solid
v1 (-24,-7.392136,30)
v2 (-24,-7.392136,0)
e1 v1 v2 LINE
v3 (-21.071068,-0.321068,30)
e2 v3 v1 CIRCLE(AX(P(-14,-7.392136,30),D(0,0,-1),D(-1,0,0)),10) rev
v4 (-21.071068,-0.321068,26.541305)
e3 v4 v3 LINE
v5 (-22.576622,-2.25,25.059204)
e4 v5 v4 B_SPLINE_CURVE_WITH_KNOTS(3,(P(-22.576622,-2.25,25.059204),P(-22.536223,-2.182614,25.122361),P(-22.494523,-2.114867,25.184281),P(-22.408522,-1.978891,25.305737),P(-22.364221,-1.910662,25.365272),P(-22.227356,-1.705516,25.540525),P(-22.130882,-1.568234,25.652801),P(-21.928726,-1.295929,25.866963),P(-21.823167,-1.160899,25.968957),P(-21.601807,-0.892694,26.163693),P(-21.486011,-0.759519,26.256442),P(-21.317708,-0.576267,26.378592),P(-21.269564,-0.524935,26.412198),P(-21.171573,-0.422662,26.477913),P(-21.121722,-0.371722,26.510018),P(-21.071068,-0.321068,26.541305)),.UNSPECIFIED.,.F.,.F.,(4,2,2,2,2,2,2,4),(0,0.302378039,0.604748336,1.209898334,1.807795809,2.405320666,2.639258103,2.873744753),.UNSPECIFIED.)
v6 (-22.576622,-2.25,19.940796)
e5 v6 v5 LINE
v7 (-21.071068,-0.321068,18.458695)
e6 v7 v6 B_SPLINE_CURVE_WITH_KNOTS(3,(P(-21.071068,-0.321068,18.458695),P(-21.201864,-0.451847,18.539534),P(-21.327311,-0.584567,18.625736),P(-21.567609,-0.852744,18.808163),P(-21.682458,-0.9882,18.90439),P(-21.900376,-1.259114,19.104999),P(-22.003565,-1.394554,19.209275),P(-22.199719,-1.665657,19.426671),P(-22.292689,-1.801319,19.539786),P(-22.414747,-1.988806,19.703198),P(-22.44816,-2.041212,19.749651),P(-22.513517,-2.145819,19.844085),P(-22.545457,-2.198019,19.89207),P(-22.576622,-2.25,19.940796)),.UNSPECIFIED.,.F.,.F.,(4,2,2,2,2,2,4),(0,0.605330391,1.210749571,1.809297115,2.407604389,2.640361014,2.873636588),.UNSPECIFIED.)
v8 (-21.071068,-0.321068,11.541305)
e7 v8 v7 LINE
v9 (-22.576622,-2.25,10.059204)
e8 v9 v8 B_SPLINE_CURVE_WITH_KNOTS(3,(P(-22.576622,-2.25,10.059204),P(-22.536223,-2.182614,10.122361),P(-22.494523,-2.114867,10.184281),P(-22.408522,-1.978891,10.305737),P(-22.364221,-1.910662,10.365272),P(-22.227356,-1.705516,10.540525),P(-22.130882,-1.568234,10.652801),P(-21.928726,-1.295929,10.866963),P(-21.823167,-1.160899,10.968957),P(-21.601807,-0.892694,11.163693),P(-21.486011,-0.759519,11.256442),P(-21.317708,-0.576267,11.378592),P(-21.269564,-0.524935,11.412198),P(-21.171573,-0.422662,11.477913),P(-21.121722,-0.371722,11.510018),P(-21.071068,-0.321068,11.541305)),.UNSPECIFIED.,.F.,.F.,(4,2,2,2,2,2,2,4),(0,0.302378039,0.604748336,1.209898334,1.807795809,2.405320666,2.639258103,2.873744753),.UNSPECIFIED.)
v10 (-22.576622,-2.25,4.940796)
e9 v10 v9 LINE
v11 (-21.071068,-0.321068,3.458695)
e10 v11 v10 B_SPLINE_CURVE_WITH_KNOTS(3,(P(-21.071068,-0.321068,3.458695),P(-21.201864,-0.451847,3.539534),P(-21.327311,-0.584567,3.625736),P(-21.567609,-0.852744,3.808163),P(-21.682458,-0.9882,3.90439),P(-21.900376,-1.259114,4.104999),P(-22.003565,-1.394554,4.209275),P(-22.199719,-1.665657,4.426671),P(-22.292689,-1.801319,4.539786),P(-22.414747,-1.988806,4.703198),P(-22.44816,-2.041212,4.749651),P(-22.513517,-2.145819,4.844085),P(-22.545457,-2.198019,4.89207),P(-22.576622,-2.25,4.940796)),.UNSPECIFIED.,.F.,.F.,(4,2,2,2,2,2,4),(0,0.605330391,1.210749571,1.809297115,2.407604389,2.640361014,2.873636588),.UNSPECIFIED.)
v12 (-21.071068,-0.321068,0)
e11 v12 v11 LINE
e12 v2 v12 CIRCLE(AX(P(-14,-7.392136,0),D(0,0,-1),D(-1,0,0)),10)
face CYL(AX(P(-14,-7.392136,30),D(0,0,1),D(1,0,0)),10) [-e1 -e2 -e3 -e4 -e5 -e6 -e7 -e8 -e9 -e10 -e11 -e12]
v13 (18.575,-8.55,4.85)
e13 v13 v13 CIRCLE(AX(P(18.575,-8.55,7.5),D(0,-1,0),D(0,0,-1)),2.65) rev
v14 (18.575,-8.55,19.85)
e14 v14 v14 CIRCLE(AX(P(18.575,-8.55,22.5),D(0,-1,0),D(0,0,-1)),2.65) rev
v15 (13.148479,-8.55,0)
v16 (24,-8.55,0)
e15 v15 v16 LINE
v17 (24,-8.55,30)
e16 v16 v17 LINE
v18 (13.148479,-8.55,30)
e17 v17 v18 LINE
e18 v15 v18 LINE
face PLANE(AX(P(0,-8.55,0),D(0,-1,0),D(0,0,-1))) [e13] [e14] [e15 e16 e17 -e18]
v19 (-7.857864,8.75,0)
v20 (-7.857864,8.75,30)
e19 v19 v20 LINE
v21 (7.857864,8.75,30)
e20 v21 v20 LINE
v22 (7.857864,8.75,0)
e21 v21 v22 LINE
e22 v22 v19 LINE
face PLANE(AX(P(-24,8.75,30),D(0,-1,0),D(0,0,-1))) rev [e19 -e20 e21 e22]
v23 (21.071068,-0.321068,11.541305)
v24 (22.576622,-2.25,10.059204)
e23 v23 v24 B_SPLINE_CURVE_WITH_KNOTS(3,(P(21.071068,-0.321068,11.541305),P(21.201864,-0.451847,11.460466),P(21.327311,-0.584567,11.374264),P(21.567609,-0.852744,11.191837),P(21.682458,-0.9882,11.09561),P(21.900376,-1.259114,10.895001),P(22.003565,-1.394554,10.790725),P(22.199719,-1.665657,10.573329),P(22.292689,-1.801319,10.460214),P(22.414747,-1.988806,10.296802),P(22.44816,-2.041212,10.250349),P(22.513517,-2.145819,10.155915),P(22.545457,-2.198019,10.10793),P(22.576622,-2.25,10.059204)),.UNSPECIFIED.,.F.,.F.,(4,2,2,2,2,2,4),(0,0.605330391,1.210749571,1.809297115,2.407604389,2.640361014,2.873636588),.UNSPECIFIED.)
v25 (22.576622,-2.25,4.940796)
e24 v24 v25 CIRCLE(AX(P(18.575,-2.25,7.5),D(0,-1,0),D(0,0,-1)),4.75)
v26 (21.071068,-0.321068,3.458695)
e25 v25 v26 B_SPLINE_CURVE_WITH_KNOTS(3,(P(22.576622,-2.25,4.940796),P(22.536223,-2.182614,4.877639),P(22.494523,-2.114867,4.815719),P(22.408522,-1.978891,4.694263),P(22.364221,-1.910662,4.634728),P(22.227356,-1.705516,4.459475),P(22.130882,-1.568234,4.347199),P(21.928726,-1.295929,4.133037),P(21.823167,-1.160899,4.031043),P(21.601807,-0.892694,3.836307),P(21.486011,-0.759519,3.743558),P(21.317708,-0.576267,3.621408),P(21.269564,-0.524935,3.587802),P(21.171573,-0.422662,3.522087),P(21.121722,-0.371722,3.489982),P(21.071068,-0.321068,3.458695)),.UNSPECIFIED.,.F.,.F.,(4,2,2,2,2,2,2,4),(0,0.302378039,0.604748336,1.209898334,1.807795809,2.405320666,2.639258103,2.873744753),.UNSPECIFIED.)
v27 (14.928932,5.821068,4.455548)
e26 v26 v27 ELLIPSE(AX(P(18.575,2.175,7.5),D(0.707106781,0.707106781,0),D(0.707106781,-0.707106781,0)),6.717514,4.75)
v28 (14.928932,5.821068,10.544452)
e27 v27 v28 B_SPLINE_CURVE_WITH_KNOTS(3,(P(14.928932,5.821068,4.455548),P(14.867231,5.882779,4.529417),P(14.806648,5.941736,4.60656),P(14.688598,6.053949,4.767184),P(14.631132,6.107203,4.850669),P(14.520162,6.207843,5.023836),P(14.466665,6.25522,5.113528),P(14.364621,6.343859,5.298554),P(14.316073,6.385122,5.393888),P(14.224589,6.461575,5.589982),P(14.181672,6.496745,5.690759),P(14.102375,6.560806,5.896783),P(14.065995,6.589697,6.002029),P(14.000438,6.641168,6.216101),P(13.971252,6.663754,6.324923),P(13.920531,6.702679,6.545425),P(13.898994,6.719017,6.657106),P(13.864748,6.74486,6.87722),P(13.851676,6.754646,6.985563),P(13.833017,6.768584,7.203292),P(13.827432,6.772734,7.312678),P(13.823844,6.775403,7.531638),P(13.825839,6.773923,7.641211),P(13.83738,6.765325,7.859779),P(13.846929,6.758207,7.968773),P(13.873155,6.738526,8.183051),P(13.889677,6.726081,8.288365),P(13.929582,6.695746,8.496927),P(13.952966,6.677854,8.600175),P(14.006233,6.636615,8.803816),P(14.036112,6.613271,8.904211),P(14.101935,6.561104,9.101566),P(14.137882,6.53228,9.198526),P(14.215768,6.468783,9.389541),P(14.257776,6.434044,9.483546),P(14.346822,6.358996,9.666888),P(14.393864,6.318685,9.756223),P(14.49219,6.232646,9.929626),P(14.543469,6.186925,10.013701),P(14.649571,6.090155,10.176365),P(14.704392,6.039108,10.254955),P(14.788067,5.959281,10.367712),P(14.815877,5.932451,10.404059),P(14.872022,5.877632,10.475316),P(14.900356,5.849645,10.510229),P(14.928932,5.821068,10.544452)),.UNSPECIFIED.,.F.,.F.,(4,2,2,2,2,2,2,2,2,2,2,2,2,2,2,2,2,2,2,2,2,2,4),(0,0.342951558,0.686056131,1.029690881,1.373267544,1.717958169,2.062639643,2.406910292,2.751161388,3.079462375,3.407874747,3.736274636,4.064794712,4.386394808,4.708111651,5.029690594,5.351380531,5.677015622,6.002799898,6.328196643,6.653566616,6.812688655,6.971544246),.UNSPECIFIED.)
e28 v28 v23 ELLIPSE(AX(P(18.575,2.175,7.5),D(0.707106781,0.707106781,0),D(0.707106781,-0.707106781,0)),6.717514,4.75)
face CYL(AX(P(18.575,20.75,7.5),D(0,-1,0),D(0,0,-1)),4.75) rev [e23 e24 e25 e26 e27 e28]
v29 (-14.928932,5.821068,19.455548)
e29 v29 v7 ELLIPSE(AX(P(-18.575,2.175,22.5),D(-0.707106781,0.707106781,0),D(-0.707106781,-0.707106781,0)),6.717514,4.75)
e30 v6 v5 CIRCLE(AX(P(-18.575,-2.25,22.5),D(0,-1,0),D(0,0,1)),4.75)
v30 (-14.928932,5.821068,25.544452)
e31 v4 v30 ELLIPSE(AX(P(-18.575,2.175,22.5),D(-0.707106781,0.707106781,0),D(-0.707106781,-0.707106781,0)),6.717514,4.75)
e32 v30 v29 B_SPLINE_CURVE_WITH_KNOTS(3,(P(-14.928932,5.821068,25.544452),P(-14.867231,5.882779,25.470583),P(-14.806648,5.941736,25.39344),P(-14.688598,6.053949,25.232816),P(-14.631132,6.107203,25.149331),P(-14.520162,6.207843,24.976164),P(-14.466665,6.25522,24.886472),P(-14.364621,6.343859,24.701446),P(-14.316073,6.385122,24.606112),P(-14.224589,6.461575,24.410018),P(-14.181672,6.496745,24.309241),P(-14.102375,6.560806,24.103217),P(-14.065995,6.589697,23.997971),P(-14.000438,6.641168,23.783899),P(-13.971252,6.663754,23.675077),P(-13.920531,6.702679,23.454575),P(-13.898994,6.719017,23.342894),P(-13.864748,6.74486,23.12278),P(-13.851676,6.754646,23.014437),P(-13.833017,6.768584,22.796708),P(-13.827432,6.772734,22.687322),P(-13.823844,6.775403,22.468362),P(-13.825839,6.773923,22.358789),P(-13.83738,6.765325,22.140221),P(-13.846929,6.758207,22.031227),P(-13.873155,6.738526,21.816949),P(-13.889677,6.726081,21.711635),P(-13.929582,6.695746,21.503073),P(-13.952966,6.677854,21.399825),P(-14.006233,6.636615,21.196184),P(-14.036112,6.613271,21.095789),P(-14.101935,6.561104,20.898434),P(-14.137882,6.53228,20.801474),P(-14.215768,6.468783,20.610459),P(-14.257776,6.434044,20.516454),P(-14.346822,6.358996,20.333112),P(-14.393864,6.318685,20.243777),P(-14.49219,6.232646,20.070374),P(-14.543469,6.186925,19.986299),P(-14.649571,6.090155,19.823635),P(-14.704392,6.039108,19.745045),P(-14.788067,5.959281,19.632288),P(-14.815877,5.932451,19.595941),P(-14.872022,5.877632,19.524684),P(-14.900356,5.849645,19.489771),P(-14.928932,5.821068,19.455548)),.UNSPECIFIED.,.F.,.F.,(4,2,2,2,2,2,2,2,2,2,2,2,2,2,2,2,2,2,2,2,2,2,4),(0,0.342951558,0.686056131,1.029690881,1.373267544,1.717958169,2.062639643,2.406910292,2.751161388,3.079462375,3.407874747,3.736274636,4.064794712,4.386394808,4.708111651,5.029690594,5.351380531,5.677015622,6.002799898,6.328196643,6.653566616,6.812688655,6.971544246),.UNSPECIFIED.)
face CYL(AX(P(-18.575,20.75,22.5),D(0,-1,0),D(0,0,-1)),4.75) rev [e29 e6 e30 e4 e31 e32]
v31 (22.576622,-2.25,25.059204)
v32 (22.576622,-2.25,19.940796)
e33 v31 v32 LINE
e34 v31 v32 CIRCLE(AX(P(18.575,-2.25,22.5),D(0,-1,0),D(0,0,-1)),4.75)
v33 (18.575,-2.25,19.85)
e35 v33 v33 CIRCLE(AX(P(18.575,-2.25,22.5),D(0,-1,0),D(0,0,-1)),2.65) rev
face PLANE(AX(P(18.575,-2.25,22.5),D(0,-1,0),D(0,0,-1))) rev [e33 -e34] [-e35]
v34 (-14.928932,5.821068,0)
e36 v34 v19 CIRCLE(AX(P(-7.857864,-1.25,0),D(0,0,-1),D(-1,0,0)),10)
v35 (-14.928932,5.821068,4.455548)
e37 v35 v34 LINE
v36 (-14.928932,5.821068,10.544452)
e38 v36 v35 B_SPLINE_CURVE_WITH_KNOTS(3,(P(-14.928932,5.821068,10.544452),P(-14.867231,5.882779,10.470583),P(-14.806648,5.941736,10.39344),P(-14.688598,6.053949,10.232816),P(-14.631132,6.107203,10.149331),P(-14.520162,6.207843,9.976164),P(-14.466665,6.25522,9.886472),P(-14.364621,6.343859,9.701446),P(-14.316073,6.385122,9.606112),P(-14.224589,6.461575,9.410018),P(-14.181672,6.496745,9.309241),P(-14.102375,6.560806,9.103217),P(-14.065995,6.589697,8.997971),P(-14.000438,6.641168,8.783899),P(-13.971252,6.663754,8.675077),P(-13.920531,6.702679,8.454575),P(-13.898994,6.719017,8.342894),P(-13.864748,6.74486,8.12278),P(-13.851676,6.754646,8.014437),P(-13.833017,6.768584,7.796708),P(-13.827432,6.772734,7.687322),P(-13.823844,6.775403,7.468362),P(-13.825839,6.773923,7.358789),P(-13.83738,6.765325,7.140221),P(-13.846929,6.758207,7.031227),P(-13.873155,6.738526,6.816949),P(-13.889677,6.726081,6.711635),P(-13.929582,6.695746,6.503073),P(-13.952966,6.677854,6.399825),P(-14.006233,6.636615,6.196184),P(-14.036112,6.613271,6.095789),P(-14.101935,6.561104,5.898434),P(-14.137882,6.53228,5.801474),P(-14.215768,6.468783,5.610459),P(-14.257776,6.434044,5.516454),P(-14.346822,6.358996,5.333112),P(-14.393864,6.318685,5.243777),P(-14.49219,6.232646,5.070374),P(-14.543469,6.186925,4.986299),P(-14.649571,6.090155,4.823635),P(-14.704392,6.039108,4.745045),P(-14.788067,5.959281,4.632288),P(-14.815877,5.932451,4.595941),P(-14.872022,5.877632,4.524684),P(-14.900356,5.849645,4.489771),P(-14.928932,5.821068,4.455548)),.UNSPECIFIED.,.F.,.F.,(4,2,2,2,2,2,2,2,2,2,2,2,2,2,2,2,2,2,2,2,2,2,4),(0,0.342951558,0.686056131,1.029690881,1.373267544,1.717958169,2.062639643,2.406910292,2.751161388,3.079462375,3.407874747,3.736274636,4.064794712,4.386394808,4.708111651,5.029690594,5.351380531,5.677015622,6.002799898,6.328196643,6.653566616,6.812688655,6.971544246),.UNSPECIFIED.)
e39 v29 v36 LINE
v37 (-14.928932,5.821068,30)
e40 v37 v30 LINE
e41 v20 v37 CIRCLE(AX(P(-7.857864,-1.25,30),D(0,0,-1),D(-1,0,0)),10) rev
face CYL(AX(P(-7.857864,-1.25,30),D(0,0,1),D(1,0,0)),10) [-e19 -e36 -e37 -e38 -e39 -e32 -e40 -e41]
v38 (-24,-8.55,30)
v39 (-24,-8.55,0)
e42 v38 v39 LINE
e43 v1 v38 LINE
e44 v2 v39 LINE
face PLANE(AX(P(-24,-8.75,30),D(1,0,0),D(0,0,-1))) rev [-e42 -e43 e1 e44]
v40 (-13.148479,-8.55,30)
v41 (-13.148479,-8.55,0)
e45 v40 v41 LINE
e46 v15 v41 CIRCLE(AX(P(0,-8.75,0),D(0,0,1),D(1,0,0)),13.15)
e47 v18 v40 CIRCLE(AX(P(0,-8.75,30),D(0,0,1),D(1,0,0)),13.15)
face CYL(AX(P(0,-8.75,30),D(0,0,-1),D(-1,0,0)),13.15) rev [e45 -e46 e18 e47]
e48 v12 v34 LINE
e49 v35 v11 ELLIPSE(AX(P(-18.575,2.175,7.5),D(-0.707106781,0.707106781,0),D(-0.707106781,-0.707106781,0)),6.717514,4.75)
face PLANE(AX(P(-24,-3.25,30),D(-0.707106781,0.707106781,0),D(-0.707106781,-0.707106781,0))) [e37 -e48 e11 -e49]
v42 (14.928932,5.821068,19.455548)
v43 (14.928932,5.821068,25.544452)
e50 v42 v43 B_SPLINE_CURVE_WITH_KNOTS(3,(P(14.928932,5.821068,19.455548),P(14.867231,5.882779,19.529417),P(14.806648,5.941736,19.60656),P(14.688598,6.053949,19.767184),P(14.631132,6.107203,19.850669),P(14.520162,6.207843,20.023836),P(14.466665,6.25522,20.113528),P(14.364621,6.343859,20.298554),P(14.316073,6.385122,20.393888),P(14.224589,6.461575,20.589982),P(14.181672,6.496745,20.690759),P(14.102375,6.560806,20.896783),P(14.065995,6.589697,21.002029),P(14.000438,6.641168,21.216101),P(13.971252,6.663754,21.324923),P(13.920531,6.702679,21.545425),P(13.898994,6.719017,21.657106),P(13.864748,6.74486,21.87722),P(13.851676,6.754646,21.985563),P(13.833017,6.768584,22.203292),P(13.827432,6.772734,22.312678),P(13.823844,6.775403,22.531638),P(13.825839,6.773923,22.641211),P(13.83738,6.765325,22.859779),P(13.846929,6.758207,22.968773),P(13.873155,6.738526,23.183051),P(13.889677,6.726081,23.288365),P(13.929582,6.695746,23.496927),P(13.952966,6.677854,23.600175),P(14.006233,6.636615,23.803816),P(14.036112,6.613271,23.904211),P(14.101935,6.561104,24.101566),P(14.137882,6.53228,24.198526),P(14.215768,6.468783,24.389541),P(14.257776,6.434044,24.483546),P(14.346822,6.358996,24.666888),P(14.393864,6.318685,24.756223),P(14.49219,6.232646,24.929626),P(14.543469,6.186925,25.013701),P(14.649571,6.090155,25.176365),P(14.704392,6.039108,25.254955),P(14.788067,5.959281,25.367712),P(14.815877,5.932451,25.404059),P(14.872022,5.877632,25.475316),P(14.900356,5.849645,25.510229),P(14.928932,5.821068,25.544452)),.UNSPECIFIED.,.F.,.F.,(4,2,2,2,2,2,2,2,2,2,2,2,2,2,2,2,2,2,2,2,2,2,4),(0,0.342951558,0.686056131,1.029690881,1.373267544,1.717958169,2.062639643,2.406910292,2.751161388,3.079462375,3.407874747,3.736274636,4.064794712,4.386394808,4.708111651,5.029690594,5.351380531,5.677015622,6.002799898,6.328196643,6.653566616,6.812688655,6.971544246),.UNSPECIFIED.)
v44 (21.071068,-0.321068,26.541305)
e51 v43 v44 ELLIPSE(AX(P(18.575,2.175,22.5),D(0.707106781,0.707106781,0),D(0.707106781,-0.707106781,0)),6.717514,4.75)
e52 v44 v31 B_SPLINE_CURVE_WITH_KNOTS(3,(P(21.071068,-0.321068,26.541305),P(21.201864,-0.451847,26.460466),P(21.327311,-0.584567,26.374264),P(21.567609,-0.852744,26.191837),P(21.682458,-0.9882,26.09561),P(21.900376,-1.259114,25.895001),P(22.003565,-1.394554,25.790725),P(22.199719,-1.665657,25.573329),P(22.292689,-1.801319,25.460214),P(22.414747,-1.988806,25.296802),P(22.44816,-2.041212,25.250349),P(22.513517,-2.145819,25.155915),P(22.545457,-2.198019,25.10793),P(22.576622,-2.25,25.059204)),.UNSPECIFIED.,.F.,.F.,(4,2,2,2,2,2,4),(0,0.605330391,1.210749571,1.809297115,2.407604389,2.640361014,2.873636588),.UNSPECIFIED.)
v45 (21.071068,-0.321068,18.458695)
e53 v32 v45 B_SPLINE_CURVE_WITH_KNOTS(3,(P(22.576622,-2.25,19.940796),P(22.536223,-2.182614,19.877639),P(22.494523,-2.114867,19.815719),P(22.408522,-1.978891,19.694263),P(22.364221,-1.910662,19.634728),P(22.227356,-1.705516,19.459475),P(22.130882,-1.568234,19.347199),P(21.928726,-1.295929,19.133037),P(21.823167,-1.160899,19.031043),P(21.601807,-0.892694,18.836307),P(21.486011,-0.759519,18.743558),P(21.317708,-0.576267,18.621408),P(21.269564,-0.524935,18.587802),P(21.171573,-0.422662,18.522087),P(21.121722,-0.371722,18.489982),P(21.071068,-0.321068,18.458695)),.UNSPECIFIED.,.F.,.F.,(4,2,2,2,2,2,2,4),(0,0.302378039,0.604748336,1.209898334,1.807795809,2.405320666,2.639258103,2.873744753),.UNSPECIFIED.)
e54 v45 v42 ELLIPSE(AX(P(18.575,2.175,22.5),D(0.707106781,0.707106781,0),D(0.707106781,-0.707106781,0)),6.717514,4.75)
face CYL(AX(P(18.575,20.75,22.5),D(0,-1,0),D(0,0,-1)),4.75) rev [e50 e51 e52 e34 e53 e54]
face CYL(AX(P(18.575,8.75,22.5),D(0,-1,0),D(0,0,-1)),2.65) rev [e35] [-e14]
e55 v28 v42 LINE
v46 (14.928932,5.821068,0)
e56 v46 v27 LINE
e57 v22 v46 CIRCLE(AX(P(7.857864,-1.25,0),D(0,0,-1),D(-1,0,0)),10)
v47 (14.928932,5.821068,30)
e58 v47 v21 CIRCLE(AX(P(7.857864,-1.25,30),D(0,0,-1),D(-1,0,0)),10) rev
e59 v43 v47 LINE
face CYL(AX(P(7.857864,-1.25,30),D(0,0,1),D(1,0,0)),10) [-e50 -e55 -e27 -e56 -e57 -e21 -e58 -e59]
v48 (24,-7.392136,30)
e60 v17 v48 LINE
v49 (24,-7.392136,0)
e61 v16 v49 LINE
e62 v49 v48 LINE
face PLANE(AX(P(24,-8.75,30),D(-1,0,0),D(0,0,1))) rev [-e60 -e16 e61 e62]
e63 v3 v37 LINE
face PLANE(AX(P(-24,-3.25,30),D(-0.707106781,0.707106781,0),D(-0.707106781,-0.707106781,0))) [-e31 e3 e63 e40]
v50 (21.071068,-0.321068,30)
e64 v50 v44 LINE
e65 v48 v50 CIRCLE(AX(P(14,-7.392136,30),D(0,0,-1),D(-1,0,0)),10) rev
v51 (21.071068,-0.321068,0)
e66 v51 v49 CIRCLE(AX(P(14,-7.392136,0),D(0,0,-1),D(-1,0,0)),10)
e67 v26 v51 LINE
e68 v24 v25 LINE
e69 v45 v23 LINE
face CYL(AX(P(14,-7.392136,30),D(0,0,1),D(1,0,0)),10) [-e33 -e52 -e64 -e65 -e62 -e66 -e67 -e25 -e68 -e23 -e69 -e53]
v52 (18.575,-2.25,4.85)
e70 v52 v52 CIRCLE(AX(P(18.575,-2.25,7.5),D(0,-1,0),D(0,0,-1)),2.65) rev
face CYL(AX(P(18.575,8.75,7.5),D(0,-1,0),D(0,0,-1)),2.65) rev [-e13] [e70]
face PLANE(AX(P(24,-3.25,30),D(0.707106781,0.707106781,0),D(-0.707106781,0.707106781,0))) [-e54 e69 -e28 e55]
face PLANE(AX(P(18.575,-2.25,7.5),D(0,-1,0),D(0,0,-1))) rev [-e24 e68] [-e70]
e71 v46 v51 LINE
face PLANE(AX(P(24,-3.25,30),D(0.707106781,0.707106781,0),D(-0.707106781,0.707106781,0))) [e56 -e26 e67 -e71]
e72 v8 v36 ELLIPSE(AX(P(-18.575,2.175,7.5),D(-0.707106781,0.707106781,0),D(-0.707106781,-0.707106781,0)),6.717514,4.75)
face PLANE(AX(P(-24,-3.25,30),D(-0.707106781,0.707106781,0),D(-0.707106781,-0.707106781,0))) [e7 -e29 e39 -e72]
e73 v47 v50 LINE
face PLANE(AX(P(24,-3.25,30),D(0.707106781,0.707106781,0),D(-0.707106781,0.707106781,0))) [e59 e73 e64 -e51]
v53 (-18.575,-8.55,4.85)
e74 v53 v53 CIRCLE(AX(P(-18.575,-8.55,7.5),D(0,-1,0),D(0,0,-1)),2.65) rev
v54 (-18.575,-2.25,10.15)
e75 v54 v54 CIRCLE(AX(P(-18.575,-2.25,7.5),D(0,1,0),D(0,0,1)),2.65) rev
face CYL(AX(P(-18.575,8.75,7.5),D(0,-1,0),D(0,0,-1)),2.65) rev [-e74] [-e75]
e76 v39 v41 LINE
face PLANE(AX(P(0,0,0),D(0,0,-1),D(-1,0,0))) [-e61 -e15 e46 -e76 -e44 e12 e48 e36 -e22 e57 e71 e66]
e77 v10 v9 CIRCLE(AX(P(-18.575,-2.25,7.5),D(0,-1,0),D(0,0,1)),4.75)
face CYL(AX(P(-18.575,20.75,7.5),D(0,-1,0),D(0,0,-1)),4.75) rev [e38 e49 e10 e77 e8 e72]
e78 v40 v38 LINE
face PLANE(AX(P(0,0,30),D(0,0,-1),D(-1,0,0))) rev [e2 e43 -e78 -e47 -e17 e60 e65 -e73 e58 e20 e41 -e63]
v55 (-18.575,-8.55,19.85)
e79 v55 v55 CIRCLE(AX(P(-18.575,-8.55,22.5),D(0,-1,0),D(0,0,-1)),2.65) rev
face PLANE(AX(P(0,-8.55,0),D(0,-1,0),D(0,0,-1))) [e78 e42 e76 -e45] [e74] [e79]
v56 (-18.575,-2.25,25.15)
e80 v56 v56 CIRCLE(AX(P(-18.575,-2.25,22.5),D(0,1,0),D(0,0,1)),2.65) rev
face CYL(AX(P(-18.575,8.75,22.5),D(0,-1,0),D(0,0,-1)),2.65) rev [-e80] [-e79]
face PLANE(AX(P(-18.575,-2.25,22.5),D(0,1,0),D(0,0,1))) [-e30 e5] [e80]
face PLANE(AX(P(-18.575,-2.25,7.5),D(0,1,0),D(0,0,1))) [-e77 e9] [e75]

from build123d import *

# Parameters (mm, degrees)
SKETCH1_W              = 48
SKETCH1_H              = 17.5
BODY_DEPTH             = 30
TUBE_CUTOUT_DEPTH      = 40.402569713
SKETCH3_R              = 2.65
CUT_EXTRUDE_M5_DEPTH   = 43.216702856
SLOPE_DEPTH            = 40.402569713
BOLT_HEAD_CUTOUT_START = -6.5
SKETCH5_R              = 4.75
BOLT_HEAD_CUTOUT_DEPTH = 23
FILLET_2_R             = 10
SKETCH7_W              = 48
SKETCH7_H              = 30
CLEARANCE_DEPTH        = 0.2


with BuildPart() as part:
    # Sketch1 → body (new body)
    with BuildSketch(Plane.XY):
        Rectangle(SKETCH1_W, SKETCH1_H)
    extrude(amount=BODY_DEPTH)

    # Sketch2 → tube_cutout (cut, through all)
    with BuildSketch(Plane.XY):
        with BuildLine():
            Line((13.15, -8.75), (-13.15, -8.75))
            ThreePointArc((-13.15, -8.75), (0, 4.4), (13.15, -8.75))
        make_face()
    extrude(amount=TUBE_CUTOUT_DEPTH, mode=Mode.SUBTRACT)

    # Sketch3 → Cut-Extrude M5 (cut, through all)
    with BuildSketch(Plane.XZ.offset(8.75)):
        with Locations(Location((18.575, 22.5, 0), (0, 0, 270))):
            Circle(SKETCH3_R)
        with Locations(Location((18.575, 7.5, 0), (0, 0, 270))):
            Circle(SKETCH3_R)
        with Locations(Location((-18.575, 7.5, 0), (0, 0, 90))):
            Circle(SKETCH3_R)
        with Locations(Location((-18.575, 22.5, 0), (0, 0, 90))):
            Circle(SKETCH3_R)
    extrude(amount=-CUT_EXTRUDE_M5_DEPTH, mode=Mode.SUBTRACT)

    # Sketch4 → slope (cut, through all)
    with BuildSketch(Plane.XY):
        Polygon((-24, 8.75), (-24, -3.25), (-12, 8.75), align=None)
        Polygon((24, -3.25), (12, 8.75), (24, 8.75), align=None)
    extrude(amount=SLOPE_DEPTH, mode=Mode.SUBTRACT)

    # Sketch5 → bolt_head_cutout (cut)
    with BuildSketch(Plane.XZ.offset(8.75).offset(BOLT_HEAD_CUTOUT_START)):
        with Locations((18.575, 22.5)):
            Circle(SKETCH5_R)
        with Locations((18.575, 7.5)):
            Circle(SKETCH5_R)
        with Locations((-18.575, 7.5)):
            Circle(SKETCH5_R)
        with Locations((-18.575, 22.5)):
            Circle(SKETCH5_R)
    extrude(amount=-BOLT_HEAD_CUTOUT_DEPTH, mode=Mode.SUBTRACT)

    # fillet 2
    # the kernel refuses this fillet: 10 mm, written as the material it takes off along each edge
    with BuildSketch(Plane(origin=(24, -3.25, -10.355339059), x_dir=(-0.7071067811865475, 0.7071067811865478, 0), z_dir=(0, 0, 1)), Plane(origin=(12, 8.75, -10.355339059), x_dir=(-1, 0, 0), z_dir=(0, 0, 1)), Plane(origin=(-12, 8.75, -10.355339059), x_dir=(-0.7071067811865474, -0.7071067811865478, 0), z_dir=(0, 0, 1))) as fillet_2_piece_1:
        with BuildLine():
            CenterArc((FILLET_2_R * 0.414213562373, FILLET_2_R), FILLET_2_R, 225, 45)
            Line((-FILLET_2_R * 0.292893218813, FILLET_2_R * 0.292893218813), (0, 0))
            Line((0, 0), (FILLET_2_R * 0.414213562373, 0))
        make_face()
    extrude(amount=50.710678119, mode=Mode.SUBTRACT)
    with BuildSketch(Plane(origin=(-24, -3.25, -10.355339059), x_dir=(0.7071067811865469, 0.707106781186548, 0), z_dir=(0, 0, 1))) as fillet_2_piece_2:
        with BuildLine():
            CenterArc((FILLET_2_R * 0.414213562373, -FILLET_2_R), FILLET_2_R, 90, 45)
            Line((-FILLET_2_R * 0.292893218813, -FILLET_2_R * 0.292893218813), (0, 0))
            Line((0, 0), (FILLET_2_R * 0.414213562373, 0))
        make_face()
    extrude(amount=50.710678119, mode=Mode.SUBTRACT)

    # Sketch7 → clearance (cut)
    with BuildSketch(Plane.XZ.offset(8.75)):
        with Locations((0, 15)):
            Rectangle(SKETCH7_W, SKETCH7_H)
    extrude(amount=-CLEARANCE_DEPTH, mode=Mode.SUBTRACT)


solid = part.part
